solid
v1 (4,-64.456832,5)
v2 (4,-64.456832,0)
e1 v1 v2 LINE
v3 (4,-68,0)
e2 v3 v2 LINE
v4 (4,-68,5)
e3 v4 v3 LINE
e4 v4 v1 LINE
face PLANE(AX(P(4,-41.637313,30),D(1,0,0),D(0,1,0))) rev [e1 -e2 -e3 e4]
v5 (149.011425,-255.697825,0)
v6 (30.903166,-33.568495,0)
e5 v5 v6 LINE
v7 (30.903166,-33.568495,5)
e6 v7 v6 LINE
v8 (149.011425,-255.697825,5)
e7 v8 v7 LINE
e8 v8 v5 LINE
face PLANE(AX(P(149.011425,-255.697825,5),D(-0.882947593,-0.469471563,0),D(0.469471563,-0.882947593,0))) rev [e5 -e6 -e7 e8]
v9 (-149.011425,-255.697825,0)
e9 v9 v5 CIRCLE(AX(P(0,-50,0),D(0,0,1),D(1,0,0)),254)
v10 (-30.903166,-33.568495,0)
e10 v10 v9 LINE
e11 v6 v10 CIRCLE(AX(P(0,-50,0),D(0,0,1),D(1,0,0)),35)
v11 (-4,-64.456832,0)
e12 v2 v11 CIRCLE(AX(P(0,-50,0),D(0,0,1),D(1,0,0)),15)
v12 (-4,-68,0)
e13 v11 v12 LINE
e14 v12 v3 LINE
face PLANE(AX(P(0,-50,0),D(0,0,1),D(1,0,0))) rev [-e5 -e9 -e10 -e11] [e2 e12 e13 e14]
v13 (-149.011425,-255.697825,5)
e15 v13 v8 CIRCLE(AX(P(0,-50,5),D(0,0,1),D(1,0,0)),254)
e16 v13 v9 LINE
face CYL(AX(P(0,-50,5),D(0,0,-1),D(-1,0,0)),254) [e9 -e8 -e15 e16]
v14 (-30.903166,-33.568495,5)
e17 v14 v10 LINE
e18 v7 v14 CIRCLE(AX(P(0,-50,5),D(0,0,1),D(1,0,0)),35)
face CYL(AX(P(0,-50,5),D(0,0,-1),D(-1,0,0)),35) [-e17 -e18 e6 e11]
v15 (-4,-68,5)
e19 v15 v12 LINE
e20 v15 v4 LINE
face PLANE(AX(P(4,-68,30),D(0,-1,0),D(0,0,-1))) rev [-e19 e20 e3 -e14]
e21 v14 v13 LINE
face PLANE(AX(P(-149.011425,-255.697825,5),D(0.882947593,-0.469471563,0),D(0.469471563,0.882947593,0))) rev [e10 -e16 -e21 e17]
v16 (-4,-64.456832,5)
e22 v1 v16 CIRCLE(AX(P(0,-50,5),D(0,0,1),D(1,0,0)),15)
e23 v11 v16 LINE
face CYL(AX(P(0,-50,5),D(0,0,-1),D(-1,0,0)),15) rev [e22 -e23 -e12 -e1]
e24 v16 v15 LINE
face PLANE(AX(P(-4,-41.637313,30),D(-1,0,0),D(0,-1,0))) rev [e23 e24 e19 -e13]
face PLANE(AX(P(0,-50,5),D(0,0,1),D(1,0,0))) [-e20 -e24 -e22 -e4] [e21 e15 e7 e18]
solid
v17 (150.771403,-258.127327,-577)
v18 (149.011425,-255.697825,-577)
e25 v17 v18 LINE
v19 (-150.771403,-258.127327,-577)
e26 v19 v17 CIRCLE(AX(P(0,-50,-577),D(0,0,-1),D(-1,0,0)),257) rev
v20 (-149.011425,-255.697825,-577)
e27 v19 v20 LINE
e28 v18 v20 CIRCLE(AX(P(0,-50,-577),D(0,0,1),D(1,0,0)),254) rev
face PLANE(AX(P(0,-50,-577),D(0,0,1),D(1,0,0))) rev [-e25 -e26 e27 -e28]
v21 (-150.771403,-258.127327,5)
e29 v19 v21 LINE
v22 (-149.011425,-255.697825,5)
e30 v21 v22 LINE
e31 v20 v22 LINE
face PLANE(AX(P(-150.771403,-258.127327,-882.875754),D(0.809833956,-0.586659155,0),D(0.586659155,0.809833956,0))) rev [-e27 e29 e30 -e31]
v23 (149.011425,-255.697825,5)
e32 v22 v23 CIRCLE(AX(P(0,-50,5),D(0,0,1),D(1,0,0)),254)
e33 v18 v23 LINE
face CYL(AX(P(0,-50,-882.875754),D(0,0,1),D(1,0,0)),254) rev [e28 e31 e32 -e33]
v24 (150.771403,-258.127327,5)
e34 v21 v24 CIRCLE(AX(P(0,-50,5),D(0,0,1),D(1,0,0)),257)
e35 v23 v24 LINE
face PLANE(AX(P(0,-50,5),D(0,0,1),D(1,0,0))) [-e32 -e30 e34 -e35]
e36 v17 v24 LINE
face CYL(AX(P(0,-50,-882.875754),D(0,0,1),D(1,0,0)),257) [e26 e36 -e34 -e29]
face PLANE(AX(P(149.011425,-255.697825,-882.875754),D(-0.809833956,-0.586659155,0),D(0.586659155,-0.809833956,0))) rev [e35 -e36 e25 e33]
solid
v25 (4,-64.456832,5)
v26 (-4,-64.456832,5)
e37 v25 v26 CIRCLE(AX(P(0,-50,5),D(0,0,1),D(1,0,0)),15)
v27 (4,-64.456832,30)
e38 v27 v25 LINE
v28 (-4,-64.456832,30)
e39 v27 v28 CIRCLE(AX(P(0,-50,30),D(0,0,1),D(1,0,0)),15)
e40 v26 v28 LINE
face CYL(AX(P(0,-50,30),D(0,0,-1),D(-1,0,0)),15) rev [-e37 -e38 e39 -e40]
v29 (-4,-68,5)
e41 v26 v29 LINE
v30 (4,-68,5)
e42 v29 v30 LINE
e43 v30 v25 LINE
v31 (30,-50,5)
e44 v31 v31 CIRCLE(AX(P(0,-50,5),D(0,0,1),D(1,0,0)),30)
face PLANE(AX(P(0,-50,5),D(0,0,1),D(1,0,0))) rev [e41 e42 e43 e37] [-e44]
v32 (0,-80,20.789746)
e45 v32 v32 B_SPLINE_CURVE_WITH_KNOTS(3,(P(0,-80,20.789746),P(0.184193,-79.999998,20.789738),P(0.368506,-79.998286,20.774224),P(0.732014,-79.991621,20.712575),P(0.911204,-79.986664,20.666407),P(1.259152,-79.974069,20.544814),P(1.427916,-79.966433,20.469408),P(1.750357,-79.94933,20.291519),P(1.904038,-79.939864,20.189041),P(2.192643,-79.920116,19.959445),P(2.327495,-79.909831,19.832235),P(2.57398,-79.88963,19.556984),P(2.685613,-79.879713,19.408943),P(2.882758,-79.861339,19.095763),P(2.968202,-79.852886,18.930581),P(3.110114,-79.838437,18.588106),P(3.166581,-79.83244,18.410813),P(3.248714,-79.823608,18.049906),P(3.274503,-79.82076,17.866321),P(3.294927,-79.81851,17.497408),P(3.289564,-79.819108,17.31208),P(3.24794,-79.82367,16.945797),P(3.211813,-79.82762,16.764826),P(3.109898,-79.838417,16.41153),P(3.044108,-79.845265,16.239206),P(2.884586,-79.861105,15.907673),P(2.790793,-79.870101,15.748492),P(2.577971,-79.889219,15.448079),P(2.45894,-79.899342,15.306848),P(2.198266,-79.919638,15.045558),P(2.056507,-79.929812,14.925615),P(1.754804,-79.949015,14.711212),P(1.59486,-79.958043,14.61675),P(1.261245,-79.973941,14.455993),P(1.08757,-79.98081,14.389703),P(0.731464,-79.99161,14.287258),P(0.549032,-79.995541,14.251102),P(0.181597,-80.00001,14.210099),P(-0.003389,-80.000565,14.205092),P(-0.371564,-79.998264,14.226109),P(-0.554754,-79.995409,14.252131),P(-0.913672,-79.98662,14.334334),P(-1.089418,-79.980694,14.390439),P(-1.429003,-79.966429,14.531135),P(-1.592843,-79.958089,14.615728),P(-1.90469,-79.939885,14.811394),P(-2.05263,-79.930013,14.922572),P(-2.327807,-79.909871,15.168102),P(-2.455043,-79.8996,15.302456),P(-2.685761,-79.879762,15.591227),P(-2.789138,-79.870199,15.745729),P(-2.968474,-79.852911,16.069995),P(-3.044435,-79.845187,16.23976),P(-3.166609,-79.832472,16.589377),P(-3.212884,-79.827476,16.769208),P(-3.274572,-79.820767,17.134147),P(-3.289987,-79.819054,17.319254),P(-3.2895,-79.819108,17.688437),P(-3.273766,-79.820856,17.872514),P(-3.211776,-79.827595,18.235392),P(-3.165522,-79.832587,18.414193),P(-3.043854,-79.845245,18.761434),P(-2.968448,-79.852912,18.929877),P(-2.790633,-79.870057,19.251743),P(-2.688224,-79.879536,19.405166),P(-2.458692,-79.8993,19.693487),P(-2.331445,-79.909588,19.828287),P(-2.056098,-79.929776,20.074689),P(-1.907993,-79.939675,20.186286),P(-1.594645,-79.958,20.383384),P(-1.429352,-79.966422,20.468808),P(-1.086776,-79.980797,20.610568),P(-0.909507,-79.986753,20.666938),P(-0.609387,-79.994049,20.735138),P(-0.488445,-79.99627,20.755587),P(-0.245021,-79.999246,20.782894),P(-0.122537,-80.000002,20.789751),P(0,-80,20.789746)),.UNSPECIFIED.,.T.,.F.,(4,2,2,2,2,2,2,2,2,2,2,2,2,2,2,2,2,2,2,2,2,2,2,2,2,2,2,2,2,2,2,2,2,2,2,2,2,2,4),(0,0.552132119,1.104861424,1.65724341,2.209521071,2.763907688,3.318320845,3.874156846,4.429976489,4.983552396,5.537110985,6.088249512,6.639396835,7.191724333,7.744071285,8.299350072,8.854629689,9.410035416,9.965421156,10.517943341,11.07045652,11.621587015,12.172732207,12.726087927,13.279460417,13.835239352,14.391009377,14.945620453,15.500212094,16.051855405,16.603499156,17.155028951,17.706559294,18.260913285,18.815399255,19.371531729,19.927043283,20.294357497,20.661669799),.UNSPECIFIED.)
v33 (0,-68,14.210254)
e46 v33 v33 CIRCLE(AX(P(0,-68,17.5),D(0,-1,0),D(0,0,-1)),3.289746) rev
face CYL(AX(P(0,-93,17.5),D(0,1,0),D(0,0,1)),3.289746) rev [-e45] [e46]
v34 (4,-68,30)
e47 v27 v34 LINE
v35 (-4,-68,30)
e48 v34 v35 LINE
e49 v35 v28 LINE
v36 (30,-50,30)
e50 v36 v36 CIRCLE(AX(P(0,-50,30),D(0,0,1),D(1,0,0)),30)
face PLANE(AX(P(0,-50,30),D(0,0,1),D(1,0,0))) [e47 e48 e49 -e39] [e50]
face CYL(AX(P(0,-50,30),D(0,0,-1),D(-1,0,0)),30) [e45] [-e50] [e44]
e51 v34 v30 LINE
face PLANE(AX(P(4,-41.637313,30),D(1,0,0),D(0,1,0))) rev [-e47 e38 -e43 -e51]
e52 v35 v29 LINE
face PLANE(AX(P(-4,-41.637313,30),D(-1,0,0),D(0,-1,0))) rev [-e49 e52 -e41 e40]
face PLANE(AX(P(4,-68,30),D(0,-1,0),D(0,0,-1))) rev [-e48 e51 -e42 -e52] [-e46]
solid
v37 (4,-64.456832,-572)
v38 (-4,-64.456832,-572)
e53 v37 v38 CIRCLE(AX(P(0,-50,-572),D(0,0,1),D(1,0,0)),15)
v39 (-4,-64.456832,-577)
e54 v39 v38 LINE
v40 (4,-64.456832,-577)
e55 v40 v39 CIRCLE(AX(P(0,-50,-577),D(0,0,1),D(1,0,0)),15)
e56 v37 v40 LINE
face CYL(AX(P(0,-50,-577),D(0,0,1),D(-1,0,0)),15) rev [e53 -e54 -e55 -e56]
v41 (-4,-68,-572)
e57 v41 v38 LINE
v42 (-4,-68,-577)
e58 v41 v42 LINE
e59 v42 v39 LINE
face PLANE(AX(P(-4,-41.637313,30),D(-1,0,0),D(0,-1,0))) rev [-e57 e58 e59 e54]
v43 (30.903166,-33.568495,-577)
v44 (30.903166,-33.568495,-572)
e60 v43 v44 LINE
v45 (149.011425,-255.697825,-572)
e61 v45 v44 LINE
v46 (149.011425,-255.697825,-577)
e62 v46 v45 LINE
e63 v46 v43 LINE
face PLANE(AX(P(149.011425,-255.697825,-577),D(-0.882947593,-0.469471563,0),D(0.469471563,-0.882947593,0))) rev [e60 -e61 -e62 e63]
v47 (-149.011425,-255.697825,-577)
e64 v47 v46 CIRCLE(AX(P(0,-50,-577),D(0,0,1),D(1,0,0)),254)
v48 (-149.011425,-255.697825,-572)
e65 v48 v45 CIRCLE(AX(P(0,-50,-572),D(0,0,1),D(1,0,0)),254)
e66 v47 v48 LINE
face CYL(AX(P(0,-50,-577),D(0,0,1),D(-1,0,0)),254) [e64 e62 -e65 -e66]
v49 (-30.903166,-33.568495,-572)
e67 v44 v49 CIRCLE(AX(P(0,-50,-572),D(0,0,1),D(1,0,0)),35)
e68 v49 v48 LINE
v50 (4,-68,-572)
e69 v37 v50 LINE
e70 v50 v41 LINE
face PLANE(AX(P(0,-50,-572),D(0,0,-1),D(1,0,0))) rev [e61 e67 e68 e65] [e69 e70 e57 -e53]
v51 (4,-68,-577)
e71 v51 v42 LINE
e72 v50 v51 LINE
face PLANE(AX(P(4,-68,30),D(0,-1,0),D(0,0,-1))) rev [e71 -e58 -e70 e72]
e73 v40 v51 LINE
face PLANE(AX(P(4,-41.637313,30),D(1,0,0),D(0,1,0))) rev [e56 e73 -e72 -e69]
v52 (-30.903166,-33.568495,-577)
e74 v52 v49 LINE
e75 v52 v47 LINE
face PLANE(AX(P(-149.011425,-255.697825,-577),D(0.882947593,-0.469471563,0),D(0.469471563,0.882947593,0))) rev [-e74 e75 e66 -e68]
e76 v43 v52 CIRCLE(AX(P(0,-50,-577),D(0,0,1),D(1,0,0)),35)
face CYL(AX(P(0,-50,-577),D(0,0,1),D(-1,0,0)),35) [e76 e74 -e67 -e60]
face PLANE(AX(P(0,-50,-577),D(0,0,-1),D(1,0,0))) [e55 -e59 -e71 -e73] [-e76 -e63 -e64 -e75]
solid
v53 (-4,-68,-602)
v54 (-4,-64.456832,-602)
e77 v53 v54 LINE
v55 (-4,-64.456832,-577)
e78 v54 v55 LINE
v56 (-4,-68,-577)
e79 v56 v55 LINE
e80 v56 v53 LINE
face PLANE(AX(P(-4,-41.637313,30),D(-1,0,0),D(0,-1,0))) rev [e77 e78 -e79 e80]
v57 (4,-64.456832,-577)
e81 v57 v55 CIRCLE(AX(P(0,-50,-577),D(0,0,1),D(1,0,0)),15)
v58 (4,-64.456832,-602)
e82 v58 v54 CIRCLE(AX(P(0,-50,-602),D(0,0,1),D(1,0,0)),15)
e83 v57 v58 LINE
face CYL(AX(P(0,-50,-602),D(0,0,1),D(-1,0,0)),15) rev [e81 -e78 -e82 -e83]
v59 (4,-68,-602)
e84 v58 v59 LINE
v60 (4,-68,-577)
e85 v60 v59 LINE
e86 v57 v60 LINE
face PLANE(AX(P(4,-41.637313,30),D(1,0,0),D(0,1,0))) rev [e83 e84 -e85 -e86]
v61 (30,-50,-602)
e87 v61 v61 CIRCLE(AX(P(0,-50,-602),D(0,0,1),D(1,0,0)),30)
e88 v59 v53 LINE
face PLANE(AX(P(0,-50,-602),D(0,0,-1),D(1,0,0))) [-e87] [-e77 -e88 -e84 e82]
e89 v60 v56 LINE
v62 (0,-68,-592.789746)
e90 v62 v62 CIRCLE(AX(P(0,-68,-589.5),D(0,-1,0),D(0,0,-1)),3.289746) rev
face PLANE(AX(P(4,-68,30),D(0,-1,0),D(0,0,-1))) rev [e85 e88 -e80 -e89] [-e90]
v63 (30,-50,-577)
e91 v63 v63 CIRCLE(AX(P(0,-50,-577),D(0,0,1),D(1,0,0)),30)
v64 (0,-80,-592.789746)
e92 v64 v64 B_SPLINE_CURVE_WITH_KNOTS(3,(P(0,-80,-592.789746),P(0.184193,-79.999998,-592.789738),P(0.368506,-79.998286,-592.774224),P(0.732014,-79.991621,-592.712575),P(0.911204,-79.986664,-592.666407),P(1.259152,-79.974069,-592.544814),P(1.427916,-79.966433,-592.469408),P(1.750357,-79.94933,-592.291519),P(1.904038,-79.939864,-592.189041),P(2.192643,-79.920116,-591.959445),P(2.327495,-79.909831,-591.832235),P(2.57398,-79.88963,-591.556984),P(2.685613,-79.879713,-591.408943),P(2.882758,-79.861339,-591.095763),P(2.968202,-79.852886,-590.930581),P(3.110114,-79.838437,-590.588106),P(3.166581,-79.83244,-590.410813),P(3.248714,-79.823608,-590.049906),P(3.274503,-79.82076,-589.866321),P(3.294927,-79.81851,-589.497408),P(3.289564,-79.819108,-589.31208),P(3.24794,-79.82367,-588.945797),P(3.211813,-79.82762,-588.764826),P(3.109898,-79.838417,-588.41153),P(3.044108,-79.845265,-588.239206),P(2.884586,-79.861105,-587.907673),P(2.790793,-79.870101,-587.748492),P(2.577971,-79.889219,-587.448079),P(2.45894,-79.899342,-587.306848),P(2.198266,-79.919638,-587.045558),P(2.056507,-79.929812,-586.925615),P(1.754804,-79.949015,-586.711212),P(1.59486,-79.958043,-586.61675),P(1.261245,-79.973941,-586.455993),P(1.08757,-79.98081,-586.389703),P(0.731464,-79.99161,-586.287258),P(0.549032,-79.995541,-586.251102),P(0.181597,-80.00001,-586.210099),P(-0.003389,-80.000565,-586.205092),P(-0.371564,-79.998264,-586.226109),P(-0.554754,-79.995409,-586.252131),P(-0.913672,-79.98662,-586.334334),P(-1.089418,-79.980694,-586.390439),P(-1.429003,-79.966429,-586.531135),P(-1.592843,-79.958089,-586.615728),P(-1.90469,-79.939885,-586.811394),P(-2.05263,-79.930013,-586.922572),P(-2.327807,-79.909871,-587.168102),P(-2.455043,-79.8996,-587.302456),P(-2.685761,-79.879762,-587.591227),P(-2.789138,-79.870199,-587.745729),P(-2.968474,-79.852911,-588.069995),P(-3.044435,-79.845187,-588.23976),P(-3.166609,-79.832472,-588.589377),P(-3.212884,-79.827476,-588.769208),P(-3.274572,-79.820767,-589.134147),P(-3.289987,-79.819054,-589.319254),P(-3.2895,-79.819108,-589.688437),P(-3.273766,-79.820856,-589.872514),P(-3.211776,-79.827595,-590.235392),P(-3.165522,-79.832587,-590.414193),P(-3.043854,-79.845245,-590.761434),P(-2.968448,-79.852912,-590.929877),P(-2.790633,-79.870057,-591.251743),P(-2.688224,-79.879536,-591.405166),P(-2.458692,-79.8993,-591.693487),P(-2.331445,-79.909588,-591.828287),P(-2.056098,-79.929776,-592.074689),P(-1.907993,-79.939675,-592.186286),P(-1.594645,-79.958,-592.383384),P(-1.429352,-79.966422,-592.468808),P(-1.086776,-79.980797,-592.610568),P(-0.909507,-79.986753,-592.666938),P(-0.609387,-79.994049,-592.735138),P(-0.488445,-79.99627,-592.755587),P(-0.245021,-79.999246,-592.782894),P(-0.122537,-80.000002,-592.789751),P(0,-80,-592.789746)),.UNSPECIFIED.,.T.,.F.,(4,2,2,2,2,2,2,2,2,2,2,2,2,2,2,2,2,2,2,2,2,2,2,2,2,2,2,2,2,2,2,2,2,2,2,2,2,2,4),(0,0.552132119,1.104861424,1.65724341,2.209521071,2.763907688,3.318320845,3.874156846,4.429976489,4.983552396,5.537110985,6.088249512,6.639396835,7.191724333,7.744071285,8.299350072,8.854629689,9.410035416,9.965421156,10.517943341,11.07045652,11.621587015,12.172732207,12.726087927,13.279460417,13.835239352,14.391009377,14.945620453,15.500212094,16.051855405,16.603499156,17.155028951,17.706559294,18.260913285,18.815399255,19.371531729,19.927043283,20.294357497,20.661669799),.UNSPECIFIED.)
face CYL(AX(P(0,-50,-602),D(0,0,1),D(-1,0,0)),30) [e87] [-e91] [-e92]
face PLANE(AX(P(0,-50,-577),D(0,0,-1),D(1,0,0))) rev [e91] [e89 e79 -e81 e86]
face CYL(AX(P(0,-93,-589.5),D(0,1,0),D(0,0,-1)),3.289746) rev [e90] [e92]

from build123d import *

# Parameters (mm, degrees)
SKETCH1_R           = 15
BOSS_EXTRUDE1_DEPTH = 5
SKETCH2_R           = 30
SKETCH2_R_2         = 15
BOSS_EXTRUDE2_DEPTH = 25
SKETCH3_R           = 3.289745787
CUT_EXTRUDE1_DEPTH  = 43
BASE_FLANGE1_START  = -582
BASE_FLANGE1_DEPTH  = 582
SKETCH6_W           = 8
SKETCH6_H           = 26.362686856
CUT_EXTRUDE2_DEPTH  = 719.613259004


# Sheet-metal steps are written as plain solids
with BuildPart() as part:
    # Sketch1 → Boss-Extrude1 (new body)
    with BuildSketch(Plane.XY):
        with BuildLine():
            Line((-149.011425297, -255.697824808), (-30.90316575, -33.568495302))
            ThreePointArc((-30.90316575, -33.568495302), (0, -15), (30.90316575, -33.568495302))
            Line((30.90316575, -33.568495302), (149.011425297, -255.697824808))
            ThreePointArc((149.011425297, -255.697824808), (0, -304), (-149.011425297, -255.697824808))
        make_face()
        with Locations((0, -50)):
            Circle(SKETCH1_R, mode=Mode.SUBTRACT)
    extrude(amount=BOSS_EXTRUDE1_DEPTH)


with BuildPart() as body_2:
    # Sketch2 → Boss-Extrude2 (new body)
    with BuildSketch(Plane.XY.offset(5)):
        with Locations((0, -50)):
            Circle(SKETCH2_R)
        with Locations((0, -50)):
            Circle(SKETCH2_R_2, mode=Mode.SUBTRACT)
    extrude(amount=BOSS_EXTRUDE2_DEPTH)

    # Sketch3 → Cut-Extrude1 (cut)
    with BuildSketch(Plane(origin=(0, -50, 0), x_dir=(1, 0, 0), z_dir=(0, 1, 0))):
        with Locations(Location((0, -17.5, 0), (0, 0, 270))):
            Circle(SKETCH3_R)
    extrude(amount=-CUT_EXTRUDE1_DEPTH, mode=Mode.SUBTRACT)


with BuildPart() as body_3:
    # Mirror7: mirrored copy
    add(part.part.mirror(Plane(origin=(0, 0, -286), x_dir=(1, 0, 0), z_dir=(0, 0, -1))))


with BuildPart() as body_4:
    # Mirror7 2: mirrored copy
    add(body_2.part.mirror(Plane(origin=(0, 0, -286), x_dir=(1, 0, 0), z_dir=(0, 0, -1))))


with BuildPart() as body_5:
    # Sketch5 → Base-Flange1 (new body)
    with BuildSketch(Plane.XY.offset(5).offset(BASE_FLANGE1_START)):
        with BuildLine():
            ThreePointArc((-149.011425297, -255.697824808), (0, -304), (149.011425297, -255.697824808))
            Line((149.011425297, -255.697824808), (150.771402761, -258.127326676))
            ThreePointArc((150.771402761, -258.127326676), (0, -307), (-150.771402761, -258.127326676))
            Line((-150.771402761, -258.127326676), (-149.011425297, -255.697824808))
        make_face()
    extrude(amount=BASE_FLANGE1_DEPTH)


with BuildPart() as cut_extrude2_tool:
    # Sketch6 → Cut-Extrude2 (new, through all)
    with BuildSketch(Plane(origin=(0, 0, -602), x_dir=(-1, 0, 0), z_dir=(0, 0, -1))):
        with Locations((0, -54.818656572)):
            Rectangle(SKETCH6_W, SKETCH6_H)
    extrude(amount=-CUT_EXTRUDE2_DEPTH)


with BuildPart() as part_1:
    add(part.part)

    # Cut-Extrude2: cut by cut_extrude2_tool
    add(cut_extrude2_tool.part, mode=Mode.SUBTRACT)


with BuildPart() as body_2_1:
    add(body_2.part)

    # Cut-Extrude2: cut by cut_extrude2_tool
    add(cut_extrude2_tool.part, mode=Mode.SUBTRACT)


with BuildPart() as body_3_1:
    add(body_3.part)

    # Cut-Extrude2: cut by cut_extrude2_tool
    add(cut_extrude2_tool.part, mode=Mode.SUBTRACT)


with BuildPart() as body_4_1:
    add(body_4.part)

    # Cut-Extrude2: cut by cut_extrude2_tool
    add(cut_extrude2_tool.part, mode=Mode.SUBTRACT)


solid = Compound([body_5.part, part_1.part, body_2_1.part, body_3_1.part, body_4_1.part])
